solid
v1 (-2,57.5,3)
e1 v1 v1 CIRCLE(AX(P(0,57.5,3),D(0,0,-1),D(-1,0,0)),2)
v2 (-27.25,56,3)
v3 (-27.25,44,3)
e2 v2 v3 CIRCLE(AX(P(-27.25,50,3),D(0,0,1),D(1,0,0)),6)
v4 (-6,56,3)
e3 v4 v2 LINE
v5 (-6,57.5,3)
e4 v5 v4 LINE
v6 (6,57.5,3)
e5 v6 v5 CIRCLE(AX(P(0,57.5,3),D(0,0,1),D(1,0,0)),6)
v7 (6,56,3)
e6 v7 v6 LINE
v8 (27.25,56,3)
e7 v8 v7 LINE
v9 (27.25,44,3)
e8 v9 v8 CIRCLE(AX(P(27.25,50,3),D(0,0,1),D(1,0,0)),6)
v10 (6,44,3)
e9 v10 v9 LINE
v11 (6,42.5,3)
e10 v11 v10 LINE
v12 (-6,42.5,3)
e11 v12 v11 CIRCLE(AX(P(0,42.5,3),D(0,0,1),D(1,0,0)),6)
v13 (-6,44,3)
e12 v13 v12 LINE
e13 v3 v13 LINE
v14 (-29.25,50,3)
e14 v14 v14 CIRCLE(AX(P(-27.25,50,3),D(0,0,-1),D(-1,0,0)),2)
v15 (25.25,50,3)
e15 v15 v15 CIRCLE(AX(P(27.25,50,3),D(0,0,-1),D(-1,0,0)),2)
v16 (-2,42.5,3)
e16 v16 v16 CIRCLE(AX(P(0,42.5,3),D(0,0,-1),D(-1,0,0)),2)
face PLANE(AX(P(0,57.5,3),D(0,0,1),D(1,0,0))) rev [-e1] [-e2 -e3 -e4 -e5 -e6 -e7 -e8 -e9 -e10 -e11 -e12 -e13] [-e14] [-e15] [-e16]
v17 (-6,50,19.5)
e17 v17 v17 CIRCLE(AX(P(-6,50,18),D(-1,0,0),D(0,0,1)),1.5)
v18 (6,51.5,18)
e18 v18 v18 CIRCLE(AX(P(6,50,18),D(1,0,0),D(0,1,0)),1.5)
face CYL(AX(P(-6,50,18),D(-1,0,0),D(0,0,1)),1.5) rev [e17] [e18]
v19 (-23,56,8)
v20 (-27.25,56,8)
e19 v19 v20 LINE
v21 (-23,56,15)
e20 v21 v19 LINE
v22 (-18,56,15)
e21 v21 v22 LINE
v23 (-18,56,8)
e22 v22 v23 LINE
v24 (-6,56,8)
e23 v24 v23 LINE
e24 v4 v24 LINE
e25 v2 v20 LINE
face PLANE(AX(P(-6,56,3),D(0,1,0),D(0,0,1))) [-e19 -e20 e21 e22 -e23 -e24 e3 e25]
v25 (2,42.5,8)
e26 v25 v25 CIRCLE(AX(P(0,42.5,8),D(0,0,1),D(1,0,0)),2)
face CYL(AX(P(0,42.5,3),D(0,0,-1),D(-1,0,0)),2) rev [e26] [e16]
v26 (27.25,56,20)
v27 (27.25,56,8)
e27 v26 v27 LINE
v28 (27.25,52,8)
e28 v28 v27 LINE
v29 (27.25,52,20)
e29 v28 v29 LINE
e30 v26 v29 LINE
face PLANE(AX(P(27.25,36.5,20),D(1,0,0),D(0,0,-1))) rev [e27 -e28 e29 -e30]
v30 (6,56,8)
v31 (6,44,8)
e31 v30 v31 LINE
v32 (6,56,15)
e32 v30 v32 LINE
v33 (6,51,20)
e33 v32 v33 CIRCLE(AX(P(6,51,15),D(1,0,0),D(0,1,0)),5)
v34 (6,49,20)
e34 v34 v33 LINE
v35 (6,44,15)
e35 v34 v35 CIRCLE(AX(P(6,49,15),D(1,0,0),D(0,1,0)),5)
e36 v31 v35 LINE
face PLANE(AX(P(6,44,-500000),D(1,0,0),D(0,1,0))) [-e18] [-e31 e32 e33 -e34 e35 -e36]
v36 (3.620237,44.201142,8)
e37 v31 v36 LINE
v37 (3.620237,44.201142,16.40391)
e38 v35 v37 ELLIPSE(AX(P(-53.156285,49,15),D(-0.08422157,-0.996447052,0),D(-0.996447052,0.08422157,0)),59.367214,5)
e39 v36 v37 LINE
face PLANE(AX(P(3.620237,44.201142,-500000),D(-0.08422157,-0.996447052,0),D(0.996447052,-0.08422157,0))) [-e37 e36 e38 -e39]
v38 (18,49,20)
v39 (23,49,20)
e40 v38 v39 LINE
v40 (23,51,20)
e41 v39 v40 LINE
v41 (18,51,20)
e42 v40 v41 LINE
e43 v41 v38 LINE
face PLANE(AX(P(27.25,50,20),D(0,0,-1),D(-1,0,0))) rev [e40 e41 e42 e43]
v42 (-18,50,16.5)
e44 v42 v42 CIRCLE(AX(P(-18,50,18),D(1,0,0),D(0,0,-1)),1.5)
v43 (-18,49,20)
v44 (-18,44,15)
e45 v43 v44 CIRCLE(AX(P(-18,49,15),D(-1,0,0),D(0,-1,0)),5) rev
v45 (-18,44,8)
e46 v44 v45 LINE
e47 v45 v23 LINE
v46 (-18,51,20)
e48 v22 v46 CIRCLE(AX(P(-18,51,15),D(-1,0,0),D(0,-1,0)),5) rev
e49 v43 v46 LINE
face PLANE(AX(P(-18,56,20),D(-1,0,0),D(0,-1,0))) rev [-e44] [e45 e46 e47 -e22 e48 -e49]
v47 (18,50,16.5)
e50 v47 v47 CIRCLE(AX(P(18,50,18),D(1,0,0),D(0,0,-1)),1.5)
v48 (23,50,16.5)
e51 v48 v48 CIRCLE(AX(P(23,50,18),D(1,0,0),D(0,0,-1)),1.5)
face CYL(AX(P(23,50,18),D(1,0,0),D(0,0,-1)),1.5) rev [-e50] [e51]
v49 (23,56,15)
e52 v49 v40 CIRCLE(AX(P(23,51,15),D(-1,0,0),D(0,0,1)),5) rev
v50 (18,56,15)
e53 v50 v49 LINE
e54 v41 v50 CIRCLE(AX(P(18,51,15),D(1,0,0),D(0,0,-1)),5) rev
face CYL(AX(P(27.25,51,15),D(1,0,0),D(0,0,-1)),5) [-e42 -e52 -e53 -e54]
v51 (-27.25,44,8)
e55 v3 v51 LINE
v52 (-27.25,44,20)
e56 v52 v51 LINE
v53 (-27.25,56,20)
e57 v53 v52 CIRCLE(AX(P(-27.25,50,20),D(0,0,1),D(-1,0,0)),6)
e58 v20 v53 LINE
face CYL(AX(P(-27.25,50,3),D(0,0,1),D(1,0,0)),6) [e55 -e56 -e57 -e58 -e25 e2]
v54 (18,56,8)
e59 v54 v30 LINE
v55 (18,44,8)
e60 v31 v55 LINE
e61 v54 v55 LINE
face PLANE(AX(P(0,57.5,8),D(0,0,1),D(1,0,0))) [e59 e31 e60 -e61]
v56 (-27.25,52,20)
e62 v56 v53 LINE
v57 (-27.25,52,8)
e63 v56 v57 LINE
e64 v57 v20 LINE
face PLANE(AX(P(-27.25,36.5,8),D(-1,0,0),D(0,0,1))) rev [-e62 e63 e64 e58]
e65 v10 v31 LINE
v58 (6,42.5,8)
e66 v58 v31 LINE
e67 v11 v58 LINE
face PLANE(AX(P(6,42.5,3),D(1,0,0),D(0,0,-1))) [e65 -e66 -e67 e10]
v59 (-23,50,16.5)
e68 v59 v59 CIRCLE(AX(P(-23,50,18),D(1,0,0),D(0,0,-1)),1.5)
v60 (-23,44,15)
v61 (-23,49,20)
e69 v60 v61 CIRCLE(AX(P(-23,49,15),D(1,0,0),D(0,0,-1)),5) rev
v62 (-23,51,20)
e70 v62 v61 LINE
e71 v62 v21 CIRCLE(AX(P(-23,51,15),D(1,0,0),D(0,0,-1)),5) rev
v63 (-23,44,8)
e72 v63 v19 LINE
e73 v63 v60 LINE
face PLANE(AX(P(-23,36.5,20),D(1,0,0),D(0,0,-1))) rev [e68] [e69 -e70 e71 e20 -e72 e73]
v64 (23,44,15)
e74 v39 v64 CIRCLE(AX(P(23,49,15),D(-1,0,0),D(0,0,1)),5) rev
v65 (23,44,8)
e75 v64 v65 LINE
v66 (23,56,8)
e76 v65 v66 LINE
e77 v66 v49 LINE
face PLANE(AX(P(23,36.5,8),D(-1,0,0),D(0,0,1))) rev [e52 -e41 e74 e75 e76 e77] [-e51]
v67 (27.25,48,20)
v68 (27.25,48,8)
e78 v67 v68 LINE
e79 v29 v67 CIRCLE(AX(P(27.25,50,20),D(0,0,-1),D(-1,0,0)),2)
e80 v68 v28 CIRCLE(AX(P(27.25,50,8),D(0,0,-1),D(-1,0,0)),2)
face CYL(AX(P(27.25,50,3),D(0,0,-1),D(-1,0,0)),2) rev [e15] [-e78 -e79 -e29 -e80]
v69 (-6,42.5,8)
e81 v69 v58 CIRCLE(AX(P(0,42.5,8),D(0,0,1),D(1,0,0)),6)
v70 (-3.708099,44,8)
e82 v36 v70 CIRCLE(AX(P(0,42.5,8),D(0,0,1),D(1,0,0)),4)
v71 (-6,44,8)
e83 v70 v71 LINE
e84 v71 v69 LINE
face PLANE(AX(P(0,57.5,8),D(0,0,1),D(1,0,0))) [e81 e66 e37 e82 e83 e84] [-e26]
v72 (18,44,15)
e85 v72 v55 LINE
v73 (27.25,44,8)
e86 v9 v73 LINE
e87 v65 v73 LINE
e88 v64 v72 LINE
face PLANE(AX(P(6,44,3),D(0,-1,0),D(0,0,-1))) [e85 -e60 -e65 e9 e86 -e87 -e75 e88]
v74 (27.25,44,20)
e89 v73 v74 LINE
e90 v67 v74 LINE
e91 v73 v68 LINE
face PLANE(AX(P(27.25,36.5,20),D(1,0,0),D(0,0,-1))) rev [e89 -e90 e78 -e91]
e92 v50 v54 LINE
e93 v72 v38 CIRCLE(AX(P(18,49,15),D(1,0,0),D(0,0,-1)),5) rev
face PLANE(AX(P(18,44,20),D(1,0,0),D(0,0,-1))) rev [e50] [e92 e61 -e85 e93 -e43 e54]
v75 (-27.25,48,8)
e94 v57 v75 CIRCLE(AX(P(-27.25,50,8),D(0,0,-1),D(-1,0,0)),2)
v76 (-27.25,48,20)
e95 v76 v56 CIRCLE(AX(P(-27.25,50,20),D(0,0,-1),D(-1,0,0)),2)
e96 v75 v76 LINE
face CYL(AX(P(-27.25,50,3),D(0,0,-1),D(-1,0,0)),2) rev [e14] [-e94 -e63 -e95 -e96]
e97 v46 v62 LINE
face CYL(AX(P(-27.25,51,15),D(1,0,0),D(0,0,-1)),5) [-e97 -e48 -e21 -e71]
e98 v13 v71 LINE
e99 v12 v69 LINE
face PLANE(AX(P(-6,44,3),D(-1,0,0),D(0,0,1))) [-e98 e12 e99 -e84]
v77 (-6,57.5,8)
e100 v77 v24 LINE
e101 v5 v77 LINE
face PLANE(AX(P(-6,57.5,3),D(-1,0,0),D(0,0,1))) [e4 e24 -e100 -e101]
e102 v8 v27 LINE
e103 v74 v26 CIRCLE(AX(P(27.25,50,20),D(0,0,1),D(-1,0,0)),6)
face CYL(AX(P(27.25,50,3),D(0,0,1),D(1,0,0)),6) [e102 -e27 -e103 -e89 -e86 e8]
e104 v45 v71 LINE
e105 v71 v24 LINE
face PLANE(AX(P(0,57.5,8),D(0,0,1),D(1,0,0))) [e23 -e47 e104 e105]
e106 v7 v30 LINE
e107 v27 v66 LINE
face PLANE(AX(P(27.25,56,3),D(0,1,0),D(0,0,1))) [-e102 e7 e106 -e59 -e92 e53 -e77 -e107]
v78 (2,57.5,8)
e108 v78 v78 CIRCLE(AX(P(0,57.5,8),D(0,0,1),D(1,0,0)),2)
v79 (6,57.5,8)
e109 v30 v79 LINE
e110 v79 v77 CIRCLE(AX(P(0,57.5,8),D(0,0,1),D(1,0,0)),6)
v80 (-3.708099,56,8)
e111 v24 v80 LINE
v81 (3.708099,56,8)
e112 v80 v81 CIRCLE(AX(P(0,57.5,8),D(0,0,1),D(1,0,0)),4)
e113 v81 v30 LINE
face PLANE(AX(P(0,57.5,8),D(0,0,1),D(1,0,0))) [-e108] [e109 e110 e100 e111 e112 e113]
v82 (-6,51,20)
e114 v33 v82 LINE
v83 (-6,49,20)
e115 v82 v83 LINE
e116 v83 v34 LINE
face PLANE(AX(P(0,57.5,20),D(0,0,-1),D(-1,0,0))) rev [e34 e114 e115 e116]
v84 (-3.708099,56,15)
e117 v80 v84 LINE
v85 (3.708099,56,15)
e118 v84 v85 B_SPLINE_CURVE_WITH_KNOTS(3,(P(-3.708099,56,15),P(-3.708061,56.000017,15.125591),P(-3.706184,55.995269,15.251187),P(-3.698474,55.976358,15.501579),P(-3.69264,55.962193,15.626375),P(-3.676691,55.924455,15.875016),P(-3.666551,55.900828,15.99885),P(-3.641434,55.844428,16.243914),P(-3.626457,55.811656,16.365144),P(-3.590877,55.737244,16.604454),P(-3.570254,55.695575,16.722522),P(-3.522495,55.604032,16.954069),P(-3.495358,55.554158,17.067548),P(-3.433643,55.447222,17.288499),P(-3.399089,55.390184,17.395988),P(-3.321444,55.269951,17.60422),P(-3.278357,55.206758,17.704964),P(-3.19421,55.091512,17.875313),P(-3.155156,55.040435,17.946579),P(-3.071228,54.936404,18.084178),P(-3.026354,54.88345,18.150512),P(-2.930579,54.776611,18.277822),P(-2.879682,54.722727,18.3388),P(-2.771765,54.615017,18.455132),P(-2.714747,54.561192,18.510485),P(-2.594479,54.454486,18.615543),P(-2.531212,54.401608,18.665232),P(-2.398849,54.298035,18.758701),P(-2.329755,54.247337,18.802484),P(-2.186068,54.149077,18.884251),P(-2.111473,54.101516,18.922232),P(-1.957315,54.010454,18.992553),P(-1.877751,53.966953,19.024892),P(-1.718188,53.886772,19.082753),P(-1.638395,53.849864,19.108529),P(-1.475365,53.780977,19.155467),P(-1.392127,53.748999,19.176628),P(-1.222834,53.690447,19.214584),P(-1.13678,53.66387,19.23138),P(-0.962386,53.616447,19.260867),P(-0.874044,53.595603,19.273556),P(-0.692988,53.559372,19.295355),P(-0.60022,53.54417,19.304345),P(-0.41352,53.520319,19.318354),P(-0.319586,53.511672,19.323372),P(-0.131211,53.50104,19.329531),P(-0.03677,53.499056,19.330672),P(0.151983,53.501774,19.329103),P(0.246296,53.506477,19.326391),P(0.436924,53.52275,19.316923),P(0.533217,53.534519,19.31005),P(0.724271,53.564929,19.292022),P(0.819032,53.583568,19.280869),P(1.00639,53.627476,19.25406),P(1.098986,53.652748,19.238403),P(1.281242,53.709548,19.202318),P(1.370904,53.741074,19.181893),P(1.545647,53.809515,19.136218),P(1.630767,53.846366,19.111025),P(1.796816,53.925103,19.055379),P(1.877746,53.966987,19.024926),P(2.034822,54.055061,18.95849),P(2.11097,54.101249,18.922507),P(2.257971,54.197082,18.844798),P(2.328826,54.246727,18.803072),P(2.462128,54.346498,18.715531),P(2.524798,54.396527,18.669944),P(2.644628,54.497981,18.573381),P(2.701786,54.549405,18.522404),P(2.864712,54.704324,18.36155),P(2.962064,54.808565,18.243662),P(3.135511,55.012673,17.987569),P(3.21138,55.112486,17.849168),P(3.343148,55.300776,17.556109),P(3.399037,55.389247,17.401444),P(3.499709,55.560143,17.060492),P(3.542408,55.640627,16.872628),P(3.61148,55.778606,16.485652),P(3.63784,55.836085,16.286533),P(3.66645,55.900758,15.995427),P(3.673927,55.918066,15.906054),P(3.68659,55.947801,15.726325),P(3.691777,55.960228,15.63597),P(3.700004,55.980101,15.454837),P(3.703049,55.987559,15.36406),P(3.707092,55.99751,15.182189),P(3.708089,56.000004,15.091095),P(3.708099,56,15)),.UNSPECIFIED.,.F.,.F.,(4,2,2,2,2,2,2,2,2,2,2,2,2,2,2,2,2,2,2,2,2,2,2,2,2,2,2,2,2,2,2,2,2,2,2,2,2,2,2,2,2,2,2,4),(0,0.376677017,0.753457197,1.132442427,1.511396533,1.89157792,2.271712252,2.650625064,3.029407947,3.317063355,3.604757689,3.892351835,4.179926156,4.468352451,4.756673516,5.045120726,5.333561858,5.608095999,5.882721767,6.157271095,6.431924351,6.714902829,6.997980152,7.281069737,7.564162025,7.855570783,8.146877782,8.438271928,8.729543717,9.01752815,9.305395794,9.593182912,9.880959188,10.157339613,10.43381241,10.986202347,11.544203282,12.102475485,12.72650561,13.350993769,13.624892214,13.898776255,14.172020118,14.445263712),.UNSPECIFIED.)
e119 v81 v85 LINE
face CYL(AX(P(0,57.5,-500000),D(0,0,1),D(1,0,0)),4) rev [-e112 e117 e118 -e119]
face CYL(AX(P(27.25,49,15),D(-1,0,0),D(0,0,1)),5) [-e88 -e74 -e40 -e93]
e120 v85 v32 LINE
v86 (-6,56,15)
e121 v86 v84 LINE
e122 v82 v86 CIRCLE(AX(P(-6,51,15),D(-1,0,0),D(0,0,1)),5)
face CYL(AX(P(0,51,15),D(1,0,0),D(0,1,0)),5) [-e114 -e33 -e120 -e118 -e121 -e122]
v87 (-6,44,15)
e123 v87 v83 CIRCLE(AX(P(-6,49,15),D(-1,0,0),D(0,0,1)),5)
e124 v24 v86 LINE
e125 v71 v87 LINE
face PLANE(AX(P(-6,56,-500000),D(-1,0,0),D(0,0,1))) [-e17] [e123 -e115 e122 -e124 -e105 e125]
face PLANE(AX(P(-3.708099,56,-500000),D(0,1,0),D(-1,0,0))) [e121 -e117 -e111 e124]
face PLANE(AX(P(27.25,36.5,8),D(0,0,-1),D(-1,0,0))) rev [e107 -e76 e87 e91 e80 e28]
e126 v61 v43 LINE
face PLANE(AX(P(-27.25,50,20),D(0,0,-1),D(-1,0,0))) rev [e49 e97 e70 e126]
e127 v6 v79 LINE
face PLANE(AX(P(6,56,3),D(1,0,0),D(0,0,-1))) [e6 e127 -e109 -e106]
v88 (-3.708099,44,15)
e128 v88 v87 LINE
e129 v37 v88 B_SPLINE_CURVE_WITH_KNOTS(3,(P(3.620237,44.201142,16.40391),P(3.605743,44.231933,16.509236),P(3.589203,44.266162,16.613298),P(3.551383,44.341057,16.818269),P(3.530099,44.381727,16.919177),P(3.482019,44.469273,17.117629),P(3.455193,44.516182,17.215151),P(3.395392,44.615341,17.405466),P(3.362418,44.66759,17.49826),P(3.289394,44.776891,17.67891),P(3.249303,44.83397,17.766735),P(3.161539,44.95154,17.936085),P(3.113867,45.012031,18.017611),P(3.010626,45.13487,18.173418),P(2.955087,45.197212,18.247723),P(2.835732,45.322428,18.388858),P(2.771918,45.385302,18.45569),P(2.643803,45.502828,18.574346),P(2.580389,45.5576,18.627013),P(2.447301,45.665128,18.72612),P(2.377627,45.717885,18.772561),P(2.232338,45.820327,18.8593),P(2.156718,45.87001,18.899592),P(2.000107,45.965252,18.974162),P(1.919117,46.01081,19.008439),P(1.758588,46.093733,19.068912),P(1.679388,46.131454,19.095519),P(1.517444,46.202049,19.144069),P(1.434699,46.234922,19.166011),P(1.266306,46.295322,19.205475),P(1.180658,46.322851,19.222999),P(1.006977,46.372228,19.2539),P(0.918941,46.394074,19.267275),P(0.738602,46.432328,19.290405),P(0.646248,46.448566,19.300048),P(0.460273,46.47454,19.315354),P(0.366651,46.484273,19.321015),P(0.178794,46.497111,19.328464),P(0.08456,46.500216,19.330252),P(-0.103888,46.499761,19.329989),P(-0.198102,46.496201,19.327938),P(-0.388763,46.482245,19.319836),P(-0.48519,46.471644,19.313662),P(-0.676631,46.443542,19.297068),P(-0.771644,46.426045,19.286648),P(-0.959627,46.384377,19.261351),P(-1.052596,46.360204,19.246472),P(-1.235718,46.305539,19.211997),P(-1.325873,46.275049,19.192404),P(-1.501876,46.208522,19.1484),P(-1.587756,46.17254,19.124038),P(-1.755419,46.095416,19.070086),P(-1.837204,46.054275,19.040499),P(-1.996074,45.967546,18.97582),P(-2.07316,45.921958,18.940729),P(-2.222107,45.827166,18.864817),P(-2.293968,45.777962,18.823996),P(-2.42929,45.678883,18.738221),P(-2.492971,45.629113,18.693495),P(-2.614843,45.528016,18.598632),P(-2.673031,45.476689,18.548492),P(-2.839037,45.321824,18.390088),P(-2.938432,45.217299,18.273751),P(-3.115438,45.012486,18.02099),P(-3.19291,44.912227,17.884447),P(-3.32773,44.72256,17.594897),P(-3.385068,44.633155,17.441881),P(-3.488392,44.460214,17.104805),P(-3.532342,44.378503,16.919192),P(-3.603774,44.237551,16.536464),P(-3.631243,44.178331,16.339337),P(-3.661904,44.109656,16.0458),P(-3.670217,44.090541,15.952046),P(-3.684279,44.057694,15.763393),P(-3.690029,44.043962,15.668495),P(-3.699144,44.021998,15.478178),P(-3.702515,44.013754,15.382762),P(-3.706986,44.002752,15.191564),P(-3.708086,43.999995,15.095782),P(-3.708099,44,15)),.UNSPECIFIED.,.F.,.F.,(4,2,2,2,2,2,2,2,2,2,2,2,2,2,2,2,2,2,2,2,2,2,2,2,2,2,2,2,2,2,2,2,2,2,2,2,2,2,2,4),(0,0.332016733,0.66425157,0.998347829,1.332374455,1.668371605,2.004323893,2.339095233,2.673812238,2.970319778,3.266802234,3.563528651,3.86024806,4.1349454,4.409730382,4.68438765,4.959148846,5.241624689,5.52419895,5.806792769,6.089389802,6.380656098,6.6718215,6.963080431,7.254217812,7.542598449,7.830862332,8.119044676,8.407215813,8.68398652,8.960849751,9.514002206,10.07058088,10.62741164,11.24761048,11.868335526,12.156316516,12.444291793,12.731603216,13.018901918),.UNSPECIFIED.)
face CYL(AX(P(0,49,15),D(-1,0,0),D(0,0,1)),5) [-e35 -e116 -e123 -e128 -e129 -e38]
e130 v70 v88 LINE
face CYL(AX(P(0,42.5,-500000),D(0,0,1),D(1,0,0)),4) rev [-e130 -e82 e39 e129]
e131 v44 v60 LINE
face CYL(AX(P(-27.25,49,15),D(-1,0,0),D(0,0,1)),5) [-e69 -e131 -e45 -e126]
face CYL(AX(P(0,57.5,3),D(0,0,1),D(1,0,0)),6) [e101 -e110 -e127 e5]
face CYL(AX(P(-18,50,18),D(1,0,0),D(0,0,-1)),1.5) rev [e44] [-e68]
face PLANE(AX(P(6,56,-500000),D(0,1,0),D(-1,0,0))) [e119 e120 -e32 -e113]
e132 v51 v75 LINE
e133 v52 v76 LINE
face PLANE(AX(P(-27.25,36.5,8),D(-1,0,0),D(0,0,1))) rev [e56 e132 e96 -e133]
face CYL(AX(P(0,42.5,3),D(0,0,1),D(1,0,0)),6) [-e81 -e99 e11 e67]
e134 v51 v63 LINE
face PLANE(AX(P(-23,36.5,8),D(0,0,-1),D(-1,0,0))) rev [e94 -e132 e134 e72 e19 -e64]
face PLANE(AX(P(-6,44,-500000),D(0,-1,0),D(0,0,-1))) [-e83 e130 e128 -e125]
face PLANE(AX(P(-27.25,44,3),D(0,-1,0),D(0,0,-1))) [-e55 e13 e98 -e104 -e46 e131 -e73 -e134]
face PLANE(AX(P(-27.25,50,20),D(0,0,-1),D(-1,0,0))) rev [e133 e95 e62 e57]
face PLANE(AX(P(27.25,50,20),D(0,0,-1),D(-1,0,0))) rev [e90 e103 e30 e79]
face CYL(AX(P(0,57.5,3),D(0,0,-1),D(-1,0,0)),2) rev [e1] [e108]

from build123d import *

# Parameters (mm, degrees)
BOSS_EXTRUDE1_DEPTH          = 5
BOSS_EXTRUDE2_START          = 12
BOSS_EXTRUDE2_DEPTH          = 12
BOSS_EXTRUDE3_START          = 12
BOSS_EXTRUDE3_DEPTH          = 12
SKETCH4_W                    = 4.25
SKETCH4_H                    = 12
CUT_EXTRUDE1_DEPTH           = 44.425942707
SKETCH5_W                    = 4.25
SKETCH5_H                    = 12
CUT_EXTRUDE2_DEPTH           = 44.425942707
BOSS_EXTRUDE4_REACH          = 75.667
F_3_0_3_DIAMETER_HOLE1_D     = 3
F_3_0_3_DIAMETER_HOLE1_DEPTH = 12
SKETCH9_W                    = 1.5
SKETCH9_H                    = 5
F_3_0_3_DIAMETER_HOLE3_D     = 3
F_3_0_3_DIAMETER_HOLE3_DEPTH = 5
F_4_0_4_DIAMETER_HOLE1_D     = 4
F_4_0_4_DIAMETER_HOLE1_DEPTH = 17
FILLET1_R                    = 5
SKETCH15_W                   = 102.81130979
SKETCH15_H                   = 78.647232544
CUT_EXTRUDE3_DEPTH           = 10


with BuildPart() as part:
    # Sketch1 → Boss-Extrude1 (new body)
    with BuildSketch(Plane.XY.offset(8)):
        with BuildLine():
            Line((-6, 57.5), (-6, 56))
            Line((-6, 56), (-27.25, 56))
            ThreePointArc((-27.25, 56), (-33.25, 50), (-27.25, 44))
            Line((-27.25, 44), (-6, 44))
            Line((-6, 44), (-6, 42.5))
            ThreePointArc((-6, 42.5), (0, 36.5), (6, 42.5))
            Line((6, 42.5), (6, 44))
            Line((6, 44), (27.25, 44))
            ThreePointArc((27.25, 44), (33.25, 50), (27.25, 56))
            Line((27.25, 56), (6, 56))
            Line((6, 56), (6, 57.5))
            ThreePointArc((6, 57.5), (0, 63.5), (-6, 57.5))
        make_face()
    extrude(amount=-BOSS_EXTRUDE1_DEPTH)

    # Sketch2 → Boss-Extrude2 (add)
    with BuildSketch(Plane.XY.offset(8).offset(BOSS_EXTRUDE2_START)):
        with BuildLine():
            Line((27.25, 44), (18, 44))
            Line((18, 44), (18, 56))
            Line((18, 56), (27.25, 56))
            ThreePointArc((27.25, 56), (33.25, 50), (27.25, 44))
        make_face()
    extrude(amount=-BOSS_EXTRUDE2_DEPTH)

    # Sketch3 → Boss-Extrude3 (add)
    with BuildSketch(Plane.XY.offset(8).offset(BOSS_EXTRUDE3_START)):
        with BuildLine():
            Line((-27.25, 56), (-18, 56))
            Line((-18, 56), (-18, 44))
            Line((-18, 44), (-27.25, 44))
            ThreePointArc((-27.25, 44), (-33.25, 50), (-27.25, 56))
        make_face()
    extrude(amount=-BOSS_EXTRUDE3_DEPTH)

    # Sketch4 → Cut-Extrude1 (cut, through all)
    with BuildSketch(Plane(origin=(0, 56, 0), x_dir=(-1, 0, 0), z_dir=(0, 1, 0))):
        with Locations((-25.125, 14)):
            Rectangle(SKETCH4_W, SKETCH4_H)
    extrude(amount=-CUT_EXTRUDE1_DEPTH, mode=Mode.SUBTRACT)

    # Sketch5 → Cut-Extrude2 (cut, through all)
    with BuildSketch(Plane(origin=(0, 56, 0), x_dir=(-1, 0, 0), z_dir=(0, 1, 0))):
        with Locations((25.125, 14)):
            Rectangle(SKETCH5_W, SKETCH5_H)
    extrude(amount=-CUT_EXTRUDE2_DEPTH, mode=Mode.SUBTRACT)

    # Sketch6 → Boss-Extrude4 (add, up to next)
    with BuildSketch(Plane.XY.offset(20), mode=Mode.PRIVATE) as boss_extrude4_sk1:
        with BuildLine():
            Line((6, 44), (6, 56))
            Line((6, 56), (3.708099244, 56))
            ThreePointArc((3.708099244, 56), (0, 53.5), (-3.708099244, 56))
            Line((-3.708099244, 56), (-6, 56))
            Line((-6, 56), (-6, 44))
            Line((-6, 44), (-3.708099244, 44))
            ThreePointArc((-3.708099244, 44), (-0.109747314, 46.498494157), (3.620236982, 44.201142026))
            Line((3.620236982, 44.201142026), (6, 44))
        make_face()
    boss_extrude4_tool1 = extrude(boss_extrude4_sk1.sketch, amount=-BOSS_EXTRUDE4_REACH, mode=Mode.PRIVATE) - part.part
    add(boss_extrude4_tool1.solids().sort_by_distance((-0.008751, 50.011684, 20))[0])

    # Ø3.0 (3) Diameter Hole1
    with Locations(Plane.ZY.offset(6)):
        with Locations((18, 50)):
            Hole(F_3_0_3_DIAMETER_HOLE1_D / 2, depth=F_3_0_3_DIAMETER_HOLE1_DEPTH)

    # Sketch9 → Ø3.0 (3) Diameter Hole2 (revolve, cut)
    with BuildSketch(Plane(origin=(23, 50, 18), x_dir=(0, 0, -1), z_dir=(0, 1, 0))):
        with Locations((0.75, 2.5)):
            Rectangle(SKETCH9_W, SKETCH9_H)
    revolve(axis=Axis((29.35, 50, 18), (-1, 0, 0)), mode=Mode.SUBTRACT)

    # Ø3.0 (3) Diameter Hole3
    with Locations(Plane(origin=(-18, 0, 0), x_dir=(0, 0, -1), z_dir=(1, 0, 0))):
        with Locations((-18, 50)):
            Hole(F_3_0_3_DIAMETER_HOLE3_D / 2, depth=F_3_0_3_DIAMETER_HOLE3_DEPTH)

    # Ø4.0 (4) Diameter Hole1
    with Locations(Plane(origin=(0, 0, 3), x_dir=(-1, 0, 0), z_dir=(0, 0, -1))):
        with Locations((0, 57.5), (-27.25, 50), (27.25, 50), (0, 42.5)):
            Hole(F_4_0_4_DIAMETER_HOLE1_D / 2, depth=F_4_0_4_DIAMETER_HOLE1_DEPTH)

    # Fillet1
    # the kernel refuses this fillet: 5 mm, written as the material it takes off along each edge
    with BuildSketch(Plane(origin=(-35.5, 56, 20), x_dir=(0, 0, -1), z_dir=(1, 0, 0))) as fillet1_piece_1_section:
        with BuildLine():
            CenterArc((FILLET1_R, -FILLET1_R), FILLET1_R, 90, 90)
            Line((0, -FILLET1_R), (0, 0))
            Line((0, 0), (FILLET1_R, 0))
        make_face()
    fillet1_piece_1 = extrude(amount=30, mode=Mode.PRIVATE)
    fillet1_piece_1 = split(fillet1_piece_1, bisect_by=Plane(origin=(-27.25, 53.041631107, 19.755841734), z_dir=(1, 0, 0)), keep=Keep.TOP, mode=Mode.PRIVATE)
    add(fillet1_piece_1, mode=Mode.SUBTRACT)
    with BuildSketch(Plane(origin=(35.5, 44, 20), x_dir=(0, 0, -1), z_dir=(-1, 0, 0))) as fillet1_piece_2_section:
        with BuildLine():
            CenterArc((FILLET1_R, -FILLET1_R), FILLET1_R, 90, 90)
            Line((0, -FILLET1_R), (0, 0))
            Line((0, 0), (FILLET1_R, 0))
        make_face()
    fillet1_piece_2 = extrude(amount=30, mode=Mode.PRIVATE)
    fillet1_piece_2 = split(fillet1_piece_2, bisect_by=Plane(origin=(27.25, 46.958368888, 19.755841732), z_dir=(-1, 0, 0)), keep=Keep.TOP, mode=Mode.PRIVATE)
    add(fillet1_piece_2, mode=Mode.SUBTRACT)
    with BuildSketch(Plane(origin=(5.5, 56, 20), x_dir=(0, 0, -1), z_dir=(1, 0, 0))) as fillet1_piece_3_section:
        with BuildLine():
            CenterArc((FILLET1_R, -FILLET1_R), FILLET1_R, 90, 90)
            Line((0, -FILLET1_R), (0, 0))
            Line((0, 0), (FILLET1_R, 0))
        make_face()
    fillet1_piece_3 = extrude(amount=30, mode=Mode.PRIVATE)
    fillet1_piece_3 = split(fillet1_piece_3, bisect_by=Plane(origin=(27.25, 54.883160305, 18.883160305), z_dir=(-1, 0, 0)), keep=Keep.TOP, mode=Mode.PRIVATE)
    add(fillet1_piece_3, mode=Mode.SUBTRACT)
    with BuildSketch(Plane(origin=(-18.5, 44, 20), x_dir=(0, 1, 0), z_dir=(1, 0, 0))) as fillet1_piece_4:
        with BuildLine():
            CenterArc((FILLET1_R, -FILLET1_R), FILLET1_R, 90, 90)
            Line((0, -FILLET1_R), (0, 0))
            Line((0, 0), (FILLET1_R, 0))
        make_face()
    extrude(amount=27.291900756, mode=Mode.SUBTRACT)
    with BuildSketch(Plane(origin=(18.5, 56, 20), x_dir=(0, 0, -1), z_dir=(-1, 0, 0))) as fillet1_piece_5:
        with BuildLine():
            CenterArc((FILLET1_R, FILLET1_R), FILLET1_R, 180, 90)
            Line((0, FILLET1_R), (0, 0))
            Line((0, 0), (FILLET1_R, 0))
        make_face()
    extrude(amount=27.291900756, mode=Mode.SUBTRACT)
    with BuildSketch(Plane(origin=(-5.5, 44, 20), x_dir=(0, 1, 0), z_dir=(-1, 0, 0))) as fillet1_piece_6_section:
        with BuildLine():
            CenterArc((FILLET1_R, FILLET1_R), FILLET1_R, 180, 90)
            Line((0, FILLET1_R), (0, 0))
            Line((0, 0), (FILLET1_R, 0))
        make_face()
    fillet1_piece_6 = extrude(amount=30, mode=Mode.PRIVATE)
    fillet1_piece_6 = split(fillet1_piece_6, bisect_by=Plane(origin=(-27.25, 45.116839695, 18.883160305), z_dir=(1, 0, 0)), keep=Keep.TOP, mode=Mode.PRIVATE)
    add(fillet1_piece_6, mode=Mode.SUBTRACT)

    # Sketch15 → Cut-Extrude3 (cut)
    with BuildSketch(Plane(origin=(0, 0, 3), x_dir=(-1, 0, 0), z_dir=(0, 0, -1))):
        with Locations((1.036291242, 56.487506321)):
            Rectangle(SKETCH15_W, SKETCH15_H)
    extrude(amount=CUT_EXTRUDE3_DEPTH, mode=Mode.SUBTRACT)


solid = part.part
